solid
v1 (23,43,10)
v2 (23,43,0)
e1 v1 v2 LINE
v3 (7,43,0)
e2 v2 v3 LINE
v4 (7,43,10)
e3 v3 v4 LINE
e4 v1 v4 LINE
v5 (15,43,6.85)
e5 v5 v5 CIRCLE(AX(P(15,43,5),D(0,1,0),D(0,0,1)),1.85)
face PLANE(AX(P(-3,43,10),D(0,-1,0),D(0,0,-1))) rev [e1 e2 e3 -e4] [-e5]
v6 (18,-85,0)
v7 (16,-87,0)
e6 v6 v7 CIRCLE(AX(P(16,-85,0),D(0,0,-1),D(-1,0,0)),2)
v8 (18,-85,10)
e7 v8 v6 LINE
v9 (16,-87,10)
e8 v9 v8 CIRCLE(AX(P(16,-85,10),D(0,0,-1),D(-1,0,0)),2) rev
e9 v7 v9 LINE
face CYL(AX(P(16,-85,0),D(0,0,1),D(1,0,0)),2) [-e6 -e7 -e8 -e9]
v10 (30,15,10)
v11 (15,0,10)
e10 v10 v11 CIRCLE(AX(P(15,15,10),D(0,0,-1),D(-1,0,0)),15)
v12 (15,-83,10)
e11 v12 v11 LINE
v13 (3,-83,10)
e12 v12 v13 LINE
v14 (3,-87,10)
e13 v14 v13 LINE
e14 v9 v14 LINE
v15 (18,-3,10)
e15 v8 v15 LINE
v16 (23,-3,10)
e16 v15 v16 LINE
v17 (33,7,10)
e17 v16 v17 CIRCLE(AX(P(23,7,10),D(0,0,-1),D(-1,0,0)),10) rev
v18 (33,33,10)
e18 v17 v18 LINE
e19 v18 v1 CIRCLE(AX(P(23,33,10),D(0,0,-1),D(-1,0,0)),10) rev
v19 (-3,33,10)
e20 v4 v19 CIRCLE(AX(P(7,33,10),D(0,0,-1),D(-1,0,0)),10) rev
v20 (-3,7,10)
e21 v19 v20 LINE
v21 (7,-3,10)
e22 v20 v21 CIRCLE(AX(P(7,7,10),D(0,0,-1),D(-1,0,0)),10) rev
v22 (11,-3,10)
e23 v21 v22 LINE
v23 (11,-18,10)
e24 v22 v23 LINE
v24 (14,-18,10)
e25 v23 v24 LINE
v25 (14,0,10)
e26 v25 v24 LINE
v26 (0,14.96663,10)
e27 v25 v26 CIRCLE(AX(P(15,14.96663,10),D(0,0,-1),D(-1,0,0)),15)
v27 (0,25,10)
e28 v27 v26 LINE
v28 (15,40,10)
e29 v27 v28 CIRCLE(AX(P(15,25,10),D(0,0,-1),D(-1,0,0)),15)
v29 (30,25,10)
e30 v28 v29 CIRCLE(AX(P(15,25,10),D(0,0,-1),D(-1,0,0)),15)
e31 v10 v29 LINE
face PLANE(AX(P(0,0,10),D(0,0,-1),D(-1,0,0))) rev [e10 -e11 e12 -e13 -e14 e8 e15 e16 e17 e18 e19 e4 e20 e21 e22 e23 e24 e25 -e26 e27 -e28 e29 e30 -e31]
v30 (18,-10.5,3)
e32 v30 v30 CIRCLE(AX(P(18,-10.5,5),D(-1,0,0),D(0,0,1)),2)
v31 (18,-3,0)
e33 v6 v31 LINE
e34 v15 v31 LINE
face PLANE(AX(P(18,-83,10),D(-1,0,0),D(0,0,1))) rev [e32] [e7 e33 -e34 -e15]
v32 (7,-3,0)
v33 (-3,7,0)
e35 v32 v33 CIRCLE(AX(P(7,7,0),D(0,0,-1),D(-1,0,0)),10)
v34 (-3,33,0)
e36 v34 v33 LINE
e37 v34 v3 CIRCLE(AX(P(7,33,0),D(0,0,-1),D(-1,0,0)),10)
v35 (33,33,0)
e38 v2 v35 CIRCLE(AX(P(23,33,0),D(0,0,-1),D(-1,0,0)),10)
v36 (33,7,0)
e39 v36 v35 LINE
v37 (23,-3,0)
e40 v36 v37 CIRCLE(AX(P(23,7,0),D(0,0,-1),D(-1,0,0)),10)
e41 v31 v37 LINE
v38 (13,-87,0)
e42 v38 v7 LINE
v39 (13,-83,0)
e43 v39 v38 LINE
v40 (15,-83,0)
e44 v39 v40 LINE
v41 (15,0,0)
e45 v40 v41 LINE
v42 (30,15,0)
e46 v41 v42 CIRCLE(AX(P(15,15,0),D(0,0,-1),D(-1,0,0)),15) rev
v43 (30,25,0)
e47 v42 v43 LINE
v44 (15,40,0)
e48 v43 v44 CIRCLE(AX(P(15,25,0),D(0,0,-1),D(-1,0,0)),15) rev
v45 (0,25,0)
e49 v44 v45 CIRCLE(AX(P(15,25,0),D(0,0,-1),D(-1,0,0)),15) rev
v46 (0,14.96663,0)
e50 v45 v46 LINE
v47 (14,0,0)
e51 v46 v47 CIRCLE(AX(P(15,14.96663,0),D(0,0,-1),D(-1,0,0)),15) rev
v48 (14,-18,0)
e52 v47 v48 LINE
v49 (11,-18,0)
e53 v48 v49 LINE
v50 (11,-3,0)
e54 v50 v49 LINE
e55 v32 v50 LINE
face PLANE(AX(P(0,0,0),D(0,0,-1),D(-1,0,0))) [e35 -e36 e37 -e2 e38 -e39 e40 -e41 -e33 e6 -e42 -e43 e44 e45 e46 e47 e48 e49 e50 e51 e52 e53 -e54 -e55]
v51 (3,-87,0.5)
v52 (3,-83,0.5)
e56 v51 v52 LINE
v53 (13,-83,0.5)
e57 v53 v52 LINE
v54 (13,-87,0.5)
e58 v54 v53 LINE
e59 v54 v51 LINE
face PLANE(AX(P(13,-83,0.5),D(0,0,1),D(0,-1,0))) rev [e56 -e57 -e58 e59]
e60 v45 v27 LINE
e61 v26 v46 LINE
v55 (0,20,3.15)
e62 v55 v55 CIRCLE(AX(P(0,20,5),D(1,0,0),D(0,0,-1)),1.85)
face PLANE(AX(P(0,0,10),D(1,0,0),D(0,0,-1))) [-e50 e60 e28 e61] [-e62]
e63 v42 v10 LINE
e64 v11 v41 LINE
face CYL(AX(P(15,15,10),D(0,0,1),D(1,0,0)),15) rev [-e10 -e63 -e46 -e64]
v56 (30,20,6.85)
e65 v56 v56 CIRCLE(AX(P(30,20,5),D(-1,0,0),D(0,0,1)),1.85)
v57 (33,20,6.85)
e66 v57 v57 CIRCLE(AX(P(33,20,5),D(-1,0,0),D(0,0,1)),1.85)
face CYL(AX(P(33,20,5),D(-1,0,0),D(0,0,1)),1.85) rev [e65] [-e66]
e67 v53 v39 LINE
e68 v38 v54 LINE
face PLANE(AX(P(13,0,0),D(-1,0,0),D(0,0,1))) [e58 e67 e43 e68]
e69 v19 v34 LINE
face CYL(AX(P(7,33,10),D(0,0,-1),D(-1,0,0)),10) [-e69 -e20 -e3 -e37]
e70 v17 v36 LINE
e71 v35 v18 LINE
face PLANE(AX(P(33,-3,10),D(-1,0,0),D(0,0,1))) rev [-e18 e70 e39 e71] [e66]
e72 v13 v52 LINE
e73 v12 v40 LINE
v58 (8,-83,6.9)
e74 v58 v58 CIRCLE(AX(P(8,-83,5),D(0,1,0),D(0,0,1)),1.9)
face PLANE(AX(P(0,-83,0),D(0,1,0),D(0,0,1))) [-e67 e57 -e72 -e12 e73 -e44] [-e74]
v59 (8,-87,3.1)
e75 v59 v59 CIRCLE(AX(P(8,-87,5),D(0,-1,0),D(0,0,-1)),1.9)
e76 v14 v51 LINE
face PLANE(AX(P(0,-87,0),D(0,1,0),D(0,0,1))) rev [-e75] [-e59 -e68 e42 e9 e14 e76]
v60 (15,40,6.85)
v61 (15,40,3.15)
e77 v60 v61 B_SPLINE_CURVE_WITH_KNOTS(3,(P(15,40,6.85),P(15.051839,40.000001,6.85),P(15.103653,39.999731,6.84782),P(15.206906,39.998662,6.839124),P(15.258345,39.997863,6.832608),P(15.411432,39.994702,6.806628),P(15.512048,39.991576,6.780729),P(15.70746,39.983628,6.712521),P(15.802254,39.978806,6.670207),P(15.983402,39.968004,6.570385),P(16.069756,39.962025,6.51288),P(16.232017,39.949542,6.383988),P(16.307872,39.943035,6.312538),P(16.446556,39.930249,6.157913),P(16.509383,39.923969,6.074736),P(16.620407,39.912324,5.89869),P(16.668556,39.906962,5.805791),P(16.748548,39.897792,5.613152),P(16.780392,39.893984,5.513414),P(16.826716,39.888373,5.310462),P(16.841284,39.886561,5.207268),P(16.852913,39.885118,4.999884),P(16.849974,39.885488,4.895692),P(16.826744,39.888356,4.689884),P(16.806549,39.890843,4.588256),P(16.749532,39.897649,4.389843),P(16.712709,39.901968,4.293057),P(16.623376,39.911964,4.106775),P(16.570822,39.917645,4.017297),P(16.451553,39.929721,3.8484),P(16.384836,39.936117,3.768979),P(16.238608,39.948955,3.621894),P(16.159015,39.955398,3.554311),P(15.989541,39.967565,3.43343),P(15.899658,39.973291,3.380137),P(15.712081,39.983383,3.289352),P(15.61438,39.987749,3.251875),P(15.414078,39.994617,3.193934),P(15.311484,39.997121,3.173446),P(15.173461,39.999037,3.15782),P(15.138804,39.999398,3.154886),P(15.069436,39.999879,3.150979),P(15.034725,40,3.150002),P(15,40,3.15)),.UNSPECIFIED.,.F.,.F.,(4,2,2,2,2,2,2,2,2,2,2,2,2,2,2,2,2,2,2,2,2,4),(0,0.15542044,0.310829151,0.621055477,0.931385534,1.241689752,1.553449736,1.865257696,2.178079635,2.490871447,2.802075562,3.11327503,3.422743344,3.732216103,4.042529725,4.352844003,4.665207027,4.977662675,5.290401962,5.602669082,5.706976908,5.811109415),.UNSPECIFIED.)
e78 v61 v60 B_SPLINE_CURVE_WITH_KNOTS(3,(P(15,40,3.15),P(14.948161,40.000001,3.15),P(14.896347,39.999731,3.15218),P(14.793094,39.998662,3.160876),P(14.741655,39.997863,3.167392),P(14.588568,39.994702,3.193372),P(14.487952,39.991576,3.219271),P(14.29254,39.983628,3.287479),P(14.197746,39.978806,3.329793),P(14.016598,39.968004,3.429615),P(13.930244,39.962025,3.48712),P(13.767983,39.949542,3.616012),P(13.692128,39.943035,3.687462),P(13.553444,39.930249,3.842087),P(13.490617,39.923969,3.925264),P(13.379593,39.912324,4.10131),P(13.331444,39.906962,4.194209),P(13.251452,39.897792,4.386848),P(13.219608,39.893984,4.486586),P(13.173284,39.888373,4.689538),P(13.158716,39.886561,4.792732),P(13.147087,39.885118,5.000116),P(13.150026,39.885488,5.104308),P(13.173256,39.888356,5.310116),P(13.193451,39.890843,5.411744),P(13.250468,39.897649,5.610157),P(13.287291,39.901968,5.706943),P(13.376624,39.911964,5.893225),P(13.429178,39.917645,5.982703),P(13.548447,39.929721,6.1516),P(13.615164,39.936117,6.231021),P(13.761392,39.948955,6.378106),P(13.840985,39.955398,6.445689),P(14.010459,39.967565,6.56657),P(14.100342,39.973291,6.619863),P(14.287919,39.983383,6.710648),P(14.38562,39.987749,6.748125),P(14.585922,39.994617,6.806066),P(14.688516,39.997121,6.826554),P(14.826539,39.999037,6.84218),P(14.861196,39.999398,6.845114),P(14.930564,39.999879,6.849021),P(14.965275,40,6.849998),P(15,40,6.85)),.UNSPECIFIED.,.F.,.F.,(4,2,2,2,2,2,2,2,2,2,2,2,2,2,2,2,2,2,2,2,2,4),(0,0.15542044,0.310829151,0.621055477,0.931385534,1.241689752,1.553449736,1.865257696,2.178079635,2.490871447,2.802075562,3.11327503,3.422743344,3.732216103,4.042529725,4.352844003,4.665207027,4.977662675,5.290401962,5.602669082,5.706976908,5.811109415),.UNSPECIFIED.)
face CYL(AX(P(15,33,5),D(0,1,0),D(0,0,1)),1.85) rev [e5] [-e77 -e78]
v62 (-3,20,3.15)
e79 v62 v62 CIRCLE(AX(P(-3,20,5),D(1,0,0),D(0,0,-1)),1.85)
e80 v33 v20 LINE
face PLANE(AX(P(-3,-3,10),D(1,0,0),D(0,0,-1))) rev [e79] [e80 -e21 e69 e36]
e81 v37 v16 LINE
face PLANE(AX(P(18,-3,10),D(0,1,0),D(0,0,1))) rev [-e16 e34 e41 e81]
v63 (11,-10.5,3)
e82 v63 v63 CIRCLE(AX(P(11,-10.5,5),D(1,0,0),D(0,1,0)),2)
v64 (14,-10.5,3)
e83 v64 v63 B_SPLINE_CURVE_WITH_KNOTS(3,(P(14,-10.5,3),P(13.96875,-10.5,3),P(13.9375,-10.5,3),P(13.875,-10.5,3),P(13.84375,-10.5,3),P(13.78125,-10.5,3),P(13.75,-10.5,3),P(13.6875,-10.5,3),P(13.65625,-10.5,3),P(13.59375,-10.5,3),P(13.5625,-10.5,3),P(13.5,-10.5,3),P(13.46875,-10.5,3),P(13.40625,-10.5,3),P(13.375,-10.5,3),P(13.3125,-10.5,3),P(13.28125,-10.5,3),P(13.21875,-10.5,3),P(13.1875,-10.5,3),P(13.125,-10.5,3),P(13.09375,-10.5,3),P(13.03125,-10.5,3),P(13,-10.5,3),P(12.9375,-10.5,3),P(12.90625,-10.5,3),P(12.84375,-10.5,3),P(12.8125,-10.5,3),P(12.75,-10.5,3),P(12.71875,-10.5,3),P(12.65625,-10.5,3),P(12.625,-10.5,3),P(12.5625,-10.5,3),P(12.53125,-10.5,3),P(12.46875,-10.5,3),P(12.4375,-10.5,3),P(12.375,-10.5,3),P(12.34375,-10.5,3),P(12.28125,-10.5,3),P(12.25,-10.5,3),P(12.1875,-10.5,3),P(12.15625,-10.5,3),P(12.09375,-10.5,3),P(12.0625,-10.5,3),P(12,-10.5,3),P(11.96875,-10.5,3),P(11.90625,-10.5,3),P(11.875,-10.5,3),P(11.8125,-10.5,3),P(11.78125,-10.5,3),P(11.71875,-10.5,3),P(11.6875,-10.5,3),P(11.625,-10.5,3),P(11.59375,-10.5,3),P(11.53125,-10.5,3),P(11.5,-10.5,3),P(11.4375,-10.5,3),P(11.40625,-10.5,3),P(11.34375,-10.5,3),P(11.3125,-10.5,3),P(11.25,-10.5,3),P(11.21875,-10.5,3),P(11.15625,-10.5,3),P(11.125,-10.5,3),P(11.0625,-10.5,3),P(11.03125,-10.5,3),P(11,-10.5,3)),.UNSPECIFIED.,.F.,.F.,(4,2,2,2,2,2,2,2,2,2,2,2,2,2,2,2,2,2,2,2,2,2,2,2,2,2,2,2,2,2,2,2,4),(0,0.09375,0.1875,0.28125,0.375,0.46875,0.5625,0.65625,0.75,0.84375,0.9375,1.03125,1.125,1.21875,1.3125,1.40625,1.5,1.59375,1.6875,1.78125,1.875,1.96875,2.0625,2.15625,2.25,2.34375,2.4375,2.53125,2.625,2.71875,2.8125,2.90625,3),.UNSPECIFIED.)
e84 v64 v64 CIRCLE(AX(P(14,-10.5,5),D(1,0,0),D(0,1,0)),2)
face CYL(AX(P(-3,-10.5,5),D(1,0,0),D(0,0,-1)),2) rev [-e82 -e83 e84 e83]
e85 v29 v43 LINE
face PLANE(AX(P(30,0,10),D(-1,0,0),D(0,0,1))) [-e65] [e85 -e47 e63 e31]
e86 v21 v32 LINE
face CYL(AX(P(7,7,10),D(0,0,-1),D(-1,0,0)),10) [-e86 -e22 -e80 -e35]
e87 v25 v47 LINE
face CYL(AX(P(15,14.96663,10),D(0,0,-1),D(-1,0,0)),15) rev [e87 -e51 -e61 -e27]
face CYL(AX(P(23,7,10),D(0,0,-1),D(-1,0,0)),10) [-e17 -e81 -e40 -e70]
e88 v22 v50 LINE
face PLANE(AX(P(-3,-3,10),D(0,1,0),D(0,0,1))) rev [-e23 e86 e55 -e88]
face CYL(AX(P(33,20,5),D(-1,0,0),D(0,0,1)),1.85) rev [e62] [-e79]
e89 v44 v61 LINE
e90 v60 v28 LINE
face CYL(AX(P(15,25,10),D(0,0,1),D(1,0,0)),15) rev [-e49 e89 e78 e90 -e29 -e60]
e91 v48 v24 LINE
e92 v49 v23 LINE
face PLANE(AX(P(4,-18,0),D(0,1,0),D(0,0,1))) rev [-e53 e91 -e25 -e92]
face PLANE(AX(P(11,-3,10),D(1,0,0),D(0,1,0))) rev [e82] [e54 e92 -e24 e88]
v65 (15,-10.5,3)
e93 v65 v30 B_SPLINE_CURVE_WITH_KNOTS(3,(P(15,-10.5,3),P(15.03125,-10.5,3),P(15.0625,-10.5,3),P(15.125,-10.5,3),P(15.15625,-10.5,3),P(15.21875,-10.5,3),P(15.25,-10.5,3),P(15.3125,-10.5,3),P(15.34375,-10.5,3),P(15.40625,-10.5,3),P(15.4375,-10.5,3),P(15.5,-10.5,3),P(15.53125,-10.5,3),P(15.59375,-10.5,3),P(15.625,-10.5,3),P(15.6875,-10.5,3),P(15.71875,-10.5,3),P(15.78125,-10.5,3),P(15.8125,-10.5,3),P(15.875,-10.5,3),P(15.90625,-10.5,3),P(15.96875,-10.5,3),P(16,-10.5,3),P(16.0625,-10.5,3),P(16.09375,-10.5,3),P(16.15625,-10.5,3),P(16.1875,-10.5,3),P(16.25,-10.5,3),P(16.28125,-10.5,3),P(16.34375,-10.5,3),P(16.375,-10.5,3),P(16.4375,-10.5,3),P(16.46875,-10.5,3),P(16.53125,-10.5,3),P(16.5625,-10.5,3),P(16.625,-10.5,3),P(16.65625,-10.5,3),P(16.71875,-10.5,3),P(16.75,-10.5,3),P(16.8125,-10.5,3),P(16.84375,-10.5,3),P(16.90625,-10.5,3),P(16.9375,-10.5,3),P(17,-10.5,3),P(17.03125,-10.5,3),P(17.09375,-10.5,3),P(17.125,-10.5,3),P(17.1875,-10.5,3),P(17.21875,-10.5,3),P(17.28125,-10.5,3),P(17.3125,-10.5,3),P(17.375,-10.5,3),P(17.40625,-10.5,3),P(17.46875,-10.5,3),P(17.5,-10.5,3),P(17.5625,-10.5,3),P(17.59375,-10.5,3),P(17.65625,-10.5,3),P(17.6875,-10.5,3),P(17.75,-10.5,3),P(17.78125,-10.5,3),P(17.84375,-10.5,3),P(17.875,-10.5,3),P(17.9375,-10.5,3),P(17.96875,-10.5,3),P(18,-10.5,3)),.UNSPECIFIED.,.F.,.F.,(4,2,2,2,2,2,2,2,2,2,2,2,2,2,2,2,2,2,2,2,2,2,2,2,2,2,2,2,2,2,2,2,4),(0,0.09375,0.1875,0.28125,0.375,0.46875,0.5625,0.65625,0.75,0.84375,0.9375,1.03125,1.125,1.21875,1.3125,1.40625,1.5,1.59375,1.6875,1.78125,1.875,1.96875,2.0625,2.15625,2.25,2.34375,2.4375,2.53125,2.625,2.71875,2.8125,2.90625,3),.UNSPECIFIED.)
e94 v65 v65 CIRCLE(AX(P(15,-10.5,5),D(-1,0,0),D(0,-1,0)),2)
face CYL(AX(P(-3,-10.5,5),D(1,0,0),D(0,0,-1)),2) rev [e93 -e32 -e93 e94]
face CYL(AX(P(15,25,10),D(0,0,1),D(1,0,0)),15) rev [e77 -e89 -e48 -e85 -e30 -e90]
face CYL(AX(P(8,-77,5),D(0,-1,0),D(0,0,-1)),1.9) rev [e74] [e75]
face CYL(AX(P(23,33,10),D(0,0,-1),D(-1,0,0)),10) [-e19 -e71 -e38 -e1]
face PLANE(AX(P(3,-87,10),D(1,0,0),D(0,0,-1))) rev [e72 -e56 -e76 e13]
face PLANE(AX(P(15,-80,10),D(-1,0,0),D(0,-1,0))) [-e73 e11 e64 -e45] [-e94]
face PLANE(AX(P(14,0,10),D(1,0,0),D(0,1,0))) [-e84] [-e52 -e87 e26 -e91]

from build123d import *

# Parameters (mm, degrees)
BOSS_EXTRUDE2_DEPTH      = 10
CUT_EXTRUDE2_DEPTH       = 90.877694674
CUT_EXTRUDE2_DEPTH_BACK  = 90.877694674
SKETCH5_W                = 11
SKETCH5_H                = 67.407766248
CUT_EXTRUDE3_DEPTH       = 87.446515257
CUT_EXTRUDE3_DEPTH_BACK  = 87.446515257
SKETCH16_R               = 1.85
FILLET16_R               = 15
CUT_EXTRUDE20_DEPTH      = 92.021975369
CUT_EXTRUDE20_DEPTH_BACK = 92.021975369
SKETCH45_R               = 1.85
SKETCH52_W               = 15
SKETCH52_H               = 10
BOSS_EXTRUDE25_DEPTH     = 4
FILLET17_R               = 10
FILLET18_R               = 2
SKETCH53_R               = 1.9
CUT_EXTRUDE25_DEPTH      = 10
SKETCH55_W               = 0.5
SKETCH55_H               = 4
CUT_EXTRUDE28_DEPTH      = 10
CUT_EXTRUDE32_DEPTH      = 91.055538419
CUT_EXTRUDE32_DEPTH_BACK = 91.055538419
SKETCH60_R               = 2
FILLET19_R               = 10
SKETCH61_R               = 1.85
CUT_EXTRUDE33_DEPTH      = 10


with BuildPart() as part:
    # Sketch2 → Boss-Extrude2 (new body)
    with BuildSketch(Plane.XY):
        Polygon((18, -3), (33, -3), (33, 43), (-3, 43), (-3, -3), (11, -3), (11, -83), (18, -83), align=None)
        Polygon((15, 0), (30, 0), (30, 40), (0, 40), (0, 0), (14, 0), (14, -80), (15, -80), align=None, mode=Mode.SUBTRACT)
    extrude(amount=BOSS_EXTRUDE2_DEPTH)

    # Sketch5 → Cut-Extrude2 (cut, two sides: drawn at the far end of the back side and taken through both)
    with BuildSketch(Plane.XY.offset(10).offset(-CUT_EXTRUDE2_DEPTH_BACK)):
        with Locations((9.5, -51.703883124)):
            Rectangle(SKETCH5_W, SKETCH5_H)
    extrude(amount=CUT_EXTRUDE2_DEPTH + CUT_EXTRUDE2_DEPTH_BACK, mode=Mode.SUBTRACT)

    # Sketch16 → Cut-Extrude3 (cut, two sides: drawn at the far end of the back side and taken through both)
    with BuildSketch(Plane.ZY.offset(-11).offset(-CUT_EXTRUDE3_DEPTH_BACK)):
        with Locations((5, -10.5)):
            Circle(SKETCH16_R)
    extrude(amount=CUT_EXTRUDE3_DEPTH + CUT_EXTRUDE3_DEPTH_BACK, mode=Mode.SUBTRACT)

    # Fillet16
    # the kernel refuses this fillet: 15 mm, written as the material it adds along each edge
    with BuildSketch(Plane(origin=(0, 40, 0), x_dir=(0, -1, 0), z_dir=(0, 0, 1)), Plane(origin=(30, 40, 0), x_dir=(-1, 0, 0), z_dir=(0, 0, 1)), Plane(origin=(30, 0, 0), x_dir=(0, 1, 0), z_dir=(0, 0, 1))) as fillet16_piece_1:
        with BuildLine():
            CenterArc((FILLET16_R, FILLET16_R), FILLET16_R, 180, 90)
            Line((0, FILLET16_R), (-FILLET16_R * 0.02, FILLET16_R))
            Line((-FILLET16_R * 0.02, FILLET16_R), (-FILLET16_R * 0.02, -FILLET16_R * 0.02))
            Line((-FILLET16_R * 0.02, -FILLET16_R * 0.02), (FILLET16_R, -FILLET16_R * 0.02))
            Line((FILLET16_R, -FILLET16_R * 0.02), (FILLET16_R, 0))
        make_face()
    extrude(amount=10)
    with BuildSketch(Plane(origin=(0, 0, 0), x_dir=(1, 0, 0), z_dir=(0, 0, 1))) as fillet16_piece_2:
        with BuildLine():
            CenterArc((15, 14.966629547), FILLET16_R, 180, 86.177446271)
            Line((0, 14.966629547), (-0.3, 14.966629547))
            Line((-0.3, 14.966629547), (-0.3, 0))
            Line((-0.3, 0), (0, -0.3))
            ThreePointArc((0, -0.3), (7, -0.3), (13.98, -0.299332591))
            Line((13.98, -0.299332591), (14, 0))
        make_face()
    extrude(amount=10)

    # Sketch45 → Cut-Extrude20 (cut, two sides: drawn at the far end of the back side and taken through both)
    with BuildSketch(Plane.ZY.offset(3).offset(-CUT_EXTRUDE20_DEPTH_BACK)):
        with Locations((5, 20)):
            Circle(SKETCH45_R)
    extrude(amount=CUT_EXTRUDE20_DEPTH + CUT_EXTRUDE20_DEPTH_BACK, mode=Mode.SUBTRACT)

    # Sketch52 → Boss-Extrude25 (add)
    with BuildSketch(Plane.XZ.offset(83)):
        with Locations((10.5, 5)):
            Rectangle(SKETCH52_W, SKETCH52_H)
    extrude(amount=BOSS_EXTRUDE25_DEPTH)

    # Fillet17
    fillet17_edges = [part.edges().sort_by_distance(p)[0] for p in [
        (-3, -3, 5),
        (33, -3, 5),
    ]]
    fillet(fillet17_edges, radius=FILLET17_R)

    # Fillet18
    fillet18_edges = [part.edges().sort_by_distance(p)[0] for p in [
        (18, -87, 5),
    ]]
    fillet(fillet18_edges, radius=FILLET18_R)

    # Sketch53 → Cut-Extrude25 (cut)
    with BuildSketch(Plane.XZ.offset(87)):
        with Locations(Location((8, 5, 0), (0, 0, 270))):
            Circle(SKETCH53_R)
    extrude(amount=-CUT_EXTRUDE25_DEPTH, mode=Mode.SUBTRACT)

    # Sketch55 → Cut-Extrude28 (cut)
    with BuildSketch(Plane.ZY.offset(-3)):
        with Locations((0.25, -85)):
            Rectangle(SKETCH55_W, SKETCH55_H)
    extrude(amount=-CUT_EXTRUDE28_DEPTH, mode=Mode.SUBTRACT)

    # Sketch60 → Cut-Extrude32 (cut, two sides: drawn at the far end of the back side and taken through both)
    with BuildSketch(Plane(origin=(18, 0, 0), x_dir=(0, 0, -1), z_dir=(1, 0, 0)).offset(-CUT_EXTRUDE32_DEPTH_BACK)):
        with Locations((-5, -10.5)):
            Circle(SKETCH60_R)
    extrude(amount=CUT_EXTRUDE32_DEPTH + CUT_EXTRUDE32_DEPTH_BACK, mode=Mode.SUBTRACT)

    # Fillet19
    fillet19_edges = [part.edges().sort_by_distance(p)[0] for p in [
        (-3, 43, 5),
        (33, 43, 5),
    ]]
    fillet(fillet19_edges, radius=FILLET19_R)

    # Sketch61 → Cut-Extrude33 (cut)
    with BuildSketch(Plane(origin=(0, 43, 0), x_dir=(1, 0, 0), z_dir=(0, 1, 0))):
        with Locations(Location((15, -5, 0), (0, 0, 270))):
            Circle(SKETCH61_R)
    extrude(amount=-CUT_EXTRUDE33_DEPTH, mode=Mode.SUBTRACT)


solid = part.part
